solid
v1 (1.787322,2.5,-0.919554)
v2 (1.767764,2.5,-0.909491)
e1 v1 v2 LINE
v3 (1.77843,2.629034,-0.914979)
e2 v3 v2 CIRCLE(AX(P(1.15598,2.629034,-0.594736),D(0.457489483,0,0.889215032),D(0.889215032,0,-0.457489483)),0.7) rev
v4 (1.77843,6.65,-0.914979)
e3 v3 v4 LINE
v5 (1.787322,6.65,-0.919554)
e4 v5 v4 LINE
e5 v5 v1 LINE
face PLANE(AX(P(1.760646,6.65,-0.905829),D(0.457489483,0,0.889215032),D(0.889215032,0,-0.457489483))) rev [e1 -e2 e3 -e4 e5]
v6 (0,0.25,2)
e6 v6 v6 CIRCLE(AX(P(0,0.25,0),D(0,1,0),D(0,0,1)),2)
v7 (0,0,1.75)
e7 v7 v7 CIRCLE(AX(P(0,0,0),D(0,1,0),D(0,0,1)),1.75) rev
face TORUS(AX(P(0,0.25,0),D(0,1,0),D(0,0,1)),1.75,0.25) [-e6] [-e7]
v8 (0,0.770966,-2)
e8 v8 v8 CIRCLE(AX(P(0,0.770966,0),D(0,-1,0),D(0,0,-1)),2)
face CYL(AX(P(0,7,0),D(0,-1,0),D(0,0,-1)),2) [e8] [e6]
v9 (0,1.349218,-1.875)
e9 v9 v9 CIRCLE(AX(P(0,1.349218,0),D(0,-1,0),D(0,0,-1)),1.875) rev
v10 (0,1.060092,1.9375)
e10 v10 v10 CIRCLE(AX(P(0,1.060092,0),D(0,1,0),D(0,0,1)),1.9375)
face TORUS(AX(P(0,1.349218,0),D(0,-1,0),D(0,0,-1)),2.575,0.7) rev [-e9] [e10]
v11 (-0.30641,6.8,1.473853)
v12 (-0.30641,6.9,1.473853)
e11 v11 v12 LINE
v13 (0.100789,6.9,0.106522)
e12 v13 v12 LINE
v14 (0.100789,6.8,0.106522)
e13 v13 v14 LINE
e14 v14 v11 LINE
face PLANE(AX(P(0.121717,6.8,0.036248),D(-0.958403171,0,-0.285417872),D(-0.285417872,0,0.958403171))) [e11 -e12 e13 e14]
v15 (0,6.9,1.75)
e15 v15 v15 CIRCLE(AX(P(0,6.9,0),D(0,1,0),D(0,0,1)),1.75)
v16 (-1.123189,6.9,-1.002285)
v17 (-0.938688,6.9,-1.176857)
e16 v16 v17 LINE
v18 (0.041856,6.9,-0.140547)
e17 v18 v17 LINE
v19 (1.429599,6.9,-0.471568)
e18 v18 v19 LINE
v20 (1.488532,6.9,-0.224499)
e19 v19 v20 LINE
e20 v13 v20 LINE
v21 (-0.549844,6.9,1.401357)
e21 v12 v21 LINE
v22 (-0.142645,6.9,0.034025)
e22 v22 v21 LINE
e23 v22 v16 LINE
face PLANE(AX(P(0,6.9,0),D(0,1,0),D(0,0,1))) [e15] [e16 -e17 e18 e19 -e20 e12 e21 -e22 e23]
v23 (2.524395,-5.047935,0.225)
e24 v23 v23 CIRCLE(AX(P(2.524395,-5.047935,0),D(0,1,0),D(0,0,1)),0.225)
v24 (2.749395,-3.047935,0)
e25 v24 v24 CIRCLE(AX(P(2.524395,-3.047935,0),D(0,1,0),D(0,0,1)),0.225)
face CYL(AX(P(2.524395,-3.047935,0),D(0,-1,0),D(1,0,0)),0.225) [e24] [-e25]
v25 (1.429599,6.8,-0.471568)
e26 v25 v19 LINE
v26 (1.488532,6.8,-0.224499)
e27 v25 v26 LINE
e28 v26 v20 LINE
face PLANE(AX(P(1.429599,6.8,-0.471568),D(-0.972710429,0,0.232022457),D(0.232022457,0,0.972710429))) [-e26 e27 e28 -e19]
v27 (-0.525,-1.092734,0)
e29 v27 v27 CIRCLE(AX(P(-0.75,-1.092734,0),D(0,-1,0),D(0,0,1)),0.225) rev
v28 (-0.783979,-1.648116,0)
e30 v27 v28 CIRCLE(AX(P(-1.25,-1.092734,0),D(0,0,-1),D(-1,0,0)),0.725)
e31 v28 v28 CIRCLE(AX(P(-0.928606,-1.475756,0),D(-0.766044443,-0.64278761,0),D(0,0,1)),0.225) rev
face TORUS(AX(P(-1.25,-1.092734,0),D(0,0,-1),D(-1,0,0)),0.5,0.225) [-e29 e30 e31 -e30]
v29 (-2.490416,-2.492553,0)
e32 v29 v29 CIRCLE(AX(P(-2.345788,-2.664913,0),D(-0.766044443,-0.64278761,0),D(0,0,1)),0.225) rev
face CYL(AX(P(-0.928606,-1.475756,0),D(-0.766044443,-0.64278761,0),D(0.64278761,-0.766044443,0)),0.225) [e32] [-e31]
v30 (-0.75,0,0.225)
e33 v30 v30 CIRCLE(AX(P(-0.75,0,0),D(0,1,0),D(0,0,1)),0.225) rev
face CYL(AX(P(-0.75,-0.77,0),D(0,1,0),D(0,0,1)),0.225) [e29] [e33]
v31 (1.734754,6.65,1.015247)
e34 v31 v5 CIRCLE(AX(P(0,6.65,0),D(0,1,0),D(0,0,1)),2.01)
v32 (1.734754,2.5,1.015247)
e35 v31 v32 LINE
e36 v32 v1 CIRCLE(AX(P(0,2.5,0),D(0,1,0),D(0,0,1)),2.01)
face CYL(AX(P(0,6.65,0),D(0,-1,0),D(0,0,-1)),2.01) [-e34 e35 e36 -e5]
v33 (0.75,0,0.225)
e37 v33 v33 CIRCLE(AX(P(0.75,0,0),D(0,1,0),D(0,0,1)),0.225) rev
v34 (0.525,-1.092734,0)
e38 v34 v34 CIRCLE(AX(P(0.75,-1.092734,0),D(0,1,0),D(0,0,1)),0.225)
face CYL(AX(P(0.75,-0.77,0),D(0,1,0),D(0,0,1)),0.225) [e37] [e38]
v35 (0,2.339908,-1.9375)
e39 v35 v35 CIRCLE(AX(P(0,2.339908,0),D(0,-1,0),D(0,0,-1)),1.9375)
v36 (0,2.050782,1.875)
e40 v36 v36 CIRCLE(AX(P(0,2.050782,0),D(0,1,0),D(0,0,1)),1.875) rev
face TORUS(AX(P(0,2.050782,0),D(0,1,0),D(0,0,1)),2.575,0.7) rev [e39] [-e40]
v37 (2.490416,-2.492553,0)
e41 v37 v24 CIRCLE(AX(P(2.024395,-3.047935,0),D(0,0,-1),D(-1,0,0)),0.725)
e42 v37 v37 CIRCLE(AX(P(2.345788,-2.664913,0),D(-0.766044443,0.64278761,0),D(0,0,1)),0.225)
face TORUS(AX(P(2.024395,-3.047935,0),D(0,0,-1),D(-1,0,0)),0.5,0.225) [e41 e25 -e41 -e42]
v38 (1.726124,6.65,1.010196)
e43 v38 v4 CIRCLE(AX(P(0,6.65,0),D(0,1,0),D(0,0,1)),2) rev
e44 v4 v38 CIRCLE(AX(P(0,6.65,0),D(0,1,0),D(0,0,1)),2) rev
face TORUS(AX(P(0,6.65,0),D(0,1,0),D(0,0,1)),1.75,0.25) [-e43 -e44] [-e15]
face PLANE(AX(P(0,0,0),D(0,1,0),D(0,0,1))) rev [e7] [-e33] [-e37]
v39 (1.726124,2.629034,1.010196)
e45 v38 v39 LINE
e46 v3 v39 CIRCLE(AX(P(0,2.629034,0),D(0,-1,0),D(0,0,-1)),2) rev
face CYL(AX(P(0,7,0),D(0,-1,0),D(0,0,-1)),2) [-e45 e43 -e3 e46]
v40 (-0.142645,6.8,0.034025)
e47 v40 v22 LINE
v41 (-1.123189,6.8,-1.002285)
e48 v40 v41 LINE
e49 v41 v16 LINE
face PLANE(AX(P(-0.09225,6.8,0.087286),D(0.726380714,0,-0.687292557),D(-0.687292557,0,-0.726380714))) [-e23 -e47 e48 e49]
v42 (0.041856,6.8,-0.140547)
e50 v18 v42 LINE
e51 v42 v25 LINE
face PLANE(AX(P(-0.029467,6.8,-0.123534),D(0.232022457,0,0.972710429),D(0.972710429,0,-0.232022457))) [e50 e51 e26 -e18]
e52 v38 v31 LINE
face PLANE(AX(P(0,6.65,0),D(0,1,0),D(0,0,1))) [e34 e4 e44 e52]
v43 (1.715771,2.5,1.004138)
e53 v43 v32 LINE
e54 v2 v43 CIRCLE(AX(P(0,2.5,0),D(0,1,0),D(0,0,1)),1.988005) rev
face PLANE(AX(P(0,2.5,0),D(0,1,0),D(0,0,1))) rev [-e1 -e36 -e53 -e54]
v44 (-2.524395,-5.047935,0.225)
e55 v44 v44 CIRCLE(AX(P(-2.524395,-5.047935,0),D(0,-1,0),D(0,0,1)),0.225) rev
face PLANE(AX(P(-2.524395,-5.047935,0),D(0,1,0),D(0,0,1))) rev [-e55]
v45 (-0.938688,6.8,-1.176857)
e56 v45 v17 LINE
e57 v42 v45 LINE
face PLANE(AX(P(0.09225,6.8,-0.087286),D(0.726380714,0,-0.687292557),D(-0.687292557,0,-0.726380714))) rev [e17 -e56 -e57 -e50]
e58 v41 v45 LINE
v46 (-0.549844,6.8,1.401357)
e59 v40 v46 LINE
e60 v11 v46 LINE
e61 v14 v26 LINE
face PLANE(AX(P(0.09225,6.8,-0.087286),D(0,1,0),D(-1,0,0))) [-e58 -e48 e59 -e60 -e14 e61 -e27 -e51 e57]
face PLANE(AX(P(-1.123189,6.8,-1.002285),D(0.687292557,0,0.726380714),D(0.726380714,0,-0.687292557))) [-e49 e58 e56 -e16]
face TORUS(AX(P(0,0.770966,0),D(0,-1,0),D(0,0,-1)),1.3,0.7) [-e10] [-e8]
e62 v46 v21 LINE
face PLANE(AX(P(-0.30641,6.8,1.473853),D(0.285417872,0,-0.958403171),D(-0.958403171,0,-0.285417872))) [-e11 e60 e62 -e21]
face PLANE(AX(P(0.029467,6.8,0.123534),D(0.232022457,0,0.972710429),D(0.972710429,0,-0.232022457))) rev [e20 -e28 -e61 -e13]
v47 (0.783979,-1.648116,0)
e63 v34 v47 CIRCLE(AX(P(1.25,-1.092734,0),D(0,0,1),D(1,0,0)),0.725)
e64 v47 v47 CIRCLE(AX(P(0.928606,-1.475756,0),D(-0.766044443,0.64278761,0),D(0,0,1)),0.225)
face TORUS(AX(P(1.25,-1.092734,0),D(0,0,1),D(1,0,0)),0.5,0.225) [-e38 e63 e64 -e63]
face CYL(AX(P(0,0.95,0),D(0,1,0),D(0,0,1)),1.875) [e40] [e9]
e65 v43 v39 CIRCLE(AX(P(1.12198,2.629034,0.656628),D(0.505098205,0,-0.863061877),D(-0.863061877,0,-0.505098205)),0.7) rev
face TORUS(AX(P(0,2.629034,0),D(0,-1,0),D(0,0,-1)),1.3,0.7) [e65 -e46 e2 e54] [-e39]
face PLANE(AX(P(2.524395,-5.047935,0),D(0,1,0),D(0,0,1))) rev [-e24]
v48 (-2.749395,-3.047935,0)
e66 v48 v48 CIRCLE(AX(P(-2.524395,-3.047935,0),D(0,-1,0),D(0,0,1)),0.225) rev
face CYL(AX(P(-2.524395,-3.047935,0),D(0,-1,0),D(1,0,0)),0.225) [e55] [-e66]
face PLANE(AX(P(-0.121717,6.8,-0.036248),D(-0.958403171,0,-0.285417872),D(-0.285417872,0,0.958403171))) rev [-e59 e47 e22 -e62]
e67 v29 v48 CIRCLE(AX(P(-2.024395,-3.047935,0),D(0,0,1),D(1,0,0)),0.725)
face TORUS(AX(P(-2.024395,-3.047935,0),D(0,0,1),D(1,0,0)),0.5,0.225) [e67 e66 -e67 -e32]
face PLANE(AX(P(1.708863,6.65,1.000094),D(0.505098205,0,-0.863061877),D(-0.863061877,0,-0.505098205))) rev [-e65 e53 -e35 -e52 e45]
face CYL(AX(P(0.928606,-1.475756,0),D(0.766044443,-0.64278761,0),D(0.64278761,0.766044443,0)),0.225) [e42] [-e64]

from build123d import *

# Parameters (mm, degrees)
SKETCH1_R               = 2
EXTRUDE1_DEPTH          = 7
SKETCH2_R               = 3.5
CUT_EXTRUDE1_DEPTH      = 0.1
FILLET1_R               = 0.25
CUT_EXTRUDE2_DEPTH      = 0.75
CUT_EXTRUDE2_DEPTH_BACK = 0.75
SKETCH3_OUTSIDE_W       = 7.784
SKETCH3_OUTSIDE_H       = 7.784
SKETCH3_OUTSIDE_R       = 1.875
FILLET2_R               = 0.7
FILLET3_R               = 0.7
CUT_EXTRUDE_THIN2_DEPTH = 0.1
CUT_EXTRUDE_THIN3_DEPTH = 0.1
CUT_EXTRUDE_THIN4_DEPTH = 0.1
SKETCH5_R               = 0.225
EXTRUDE2_DEPTH          = 0.77
BOSS_EXTRUDE1_DEPTH     = 4.15
SKETCH9_R               = 0.225


with BuildPart() as part:
    # Sketch1 → Extrude1 (new body)
    with BuildSketch(Plane(origin=(0, 0, 0), x_dir=(1, 0, 0), z_dir=(0, 1, 0))):
        with Locations(Location((0, 0, 0), (0, 0, 270))):
            Circle(SKETCH1_R)
    extrude(amount=EXTRUDE1_DEPTH)

    # Sketch2 → Cut-Extrude1 (cut)
    with BuildSketch(Plane(origin=(0, 7, 0), x_dir=(-1, 0, 0), z_dir=(0, 1, 0))):
        Circle(SKETCH2_R)
    extrude(amount=-CUT_EXTRUDE1_DEPTH, mode=Mode.SUBTRACT)

    # Fillet1
    fillet1_edges = [part.edges().sort_by_distance(p)[0] for p in [
        (0, 0, -2),
        (0, 6.9, -2),
    ]]
    fillet(fillet1_edges, radius=FILLET1_R)

    # Sketch3 outside → Cut-Extrude2 (cut, two sides: drawn at the far end of the back side and taken through both)
    with BuildSketch(Plane(origin=(0, 1.7, 0), x_dir=(-1, 0, 0), z_dir=(0, 1, 0)).offset(-CUT_EXTRUDE2_DEPTH_BACK)):
        Rectangle(SKETCH3_OUTSIDE_W, SKETCH3_OUTSIDE_H)
        with Locations(Location((0, 0, 0), (0, 0, 90))):
            Circle(SKETCH3_OUTSIDE_R, mode=Mode.SUBTRACT)
    extrude(amount=CUT_EXTRUDE2_DEPTH + CUT_EXTRUDE2_DEPTH_BACK, mode=Mode.SUBTRACT)

    # Fillet2
    # the kernel refuses this fillet: 0.7 mm, written as the material it adds along each edge
    with BuildSketch(Plane(origin=(0, 0.95, 0), x_dir=(0, 0, 1), z_dir=(-1, 0, 0))) as fillet2_piece_1:
        with BuildLine():
            CenterArc((2.575, 0.399217986), FILLET2_R, 180, 34.771944032)
            Line((1.875, 0.399217986), (1.861, 0.399217986))
            Line((1.861, 0.399217986), (1.861, 0))
            Line((1.861, 0), (1.875, -0.014))
            ThreePointArc((1.875, -0.014), (1.9375, -0.014), (1.9885, -0.00798436))
            Line((1.9885, -0.00798436), (2, 0))
        make_face()
    revolve(axis=Axis((0, 0.95, 0), (0, 1, 0)))
    with BuildSketch(Plane(origin=(0, 2.45, 0), x_dir=(0, 0, 1), z_dir=(-1, 0, 0))) as fillet2_piece_2:
        with BuildLine():
            CenterArc((2.575, -0.399217986), FILLET2_R, 145.228055968, 34.771944032)
            Line((2, 0), (1.9885, 0.00798436))
            ThreePointArc((1.9885, 0.00798436), (1.9375, 0.014), (1.875, 0.014))
            Line((1.875, 0.014), (1.861, 0))
            Line((1.861, 0), (1.861, -0.399217986))
            Line((1.861, -0.399217986), (1.875, -0.399217986))
        make_face()
    revolve(axis=Axis((0, 2.45, 0), (0, 1, 0)))

    # Fillet3
    fillet3_edges = [part.edges().sort_by_distance(p)[0] for p in [
        (0, 2.45, -2),
        (0, 0.95, -2),
    ]]
    fillet(fillet3_edges, radius=FILLET3_R)

    # Sketch4 → Cut-Extrude-Thin2 (cut)
    with BuildSketch(Plane(origin=(0, 6.9, 0), x_dir=(-1, 0, 0), z_dir=(0, 1, 0))):
        Polygon((-0.092250351, -0.087286155), (0.938688485, -1.176857225), (1.123189186, -1.002284916), (0.092250351, 0.087286155), align=None)
    extrude(amount=-CUT_EXTRUDE_THIN2_DEPTH, mode=Mode.SUBTRACT)

    # Sketch4<3> → Cut-Extrude-Thin3 (cut)
    with BuildSketch(Plane(origin=(0, 6.9, 0), x_dir=(-1, 0, 0), z_dir=(0, 1, 0))):
        Polygon((-0.029466852, 0.123534225), (-1.488532496, -0.224499462), (-1.429598792, -0.471567911), (0.029466852, -0.123534225), align=None)
    extrude(amount=-CUT_EXTRUDE_THIN3_DEPTH, mode=Mode.SUBTRACT)

    # Sketch4<4> → Cut-Extrude-Thin4 (cut)
    with BuildSketch(Plane(origin=(0, 6.9, 0), x_dir=(-1, 0, 0), z_dir=(0, 1, 0))):
        Polygon((0.121717203, -0.03624807), (0.549844011, 1.401356687), (0.306409606, 1.473852826), (-0.121717203, 0.03624807), align=None)
    extrude(amount=-CUT_EXTRUDE_THIN4_DEPTH, mode=Mode.SUBTRACT)

    # Sketch5 → Extrude2 (add)
    with BuildSketch(Plane.XZ):
        with Locations(Location((-0.75, 0, 0), (0, 0, 90))):
            Circle(SKETCH5_R)
        with Locations(Location((0.75, 0, 0), (0, 0, 90))):
            Circle(SKETCH5_R)
    extrude(amount=EXTRUDE2_DEPTH)

    # Sketch6 → Boss-Extrude1 (add)
    with BuildSketch(Plane(origin=(0, 2.5, 0), x_dir=(1, 0, 0), z_dir=(0, 1, 0))):
        with BuildLine():
            Line((1.760645763, 0.905829177), (1.787322214, 0.919553862))
            ThreePointArc((1.787322214, 0.919553862), (2.009258531, -0.054590818), (1.734754372, -1.015247393))
            Line((1.734754372, -1.015247393), (1.708862516, -1.000094447))
            ThreePointArc((1.708862516, -1.000094447), (1.979269597, -0.05377603), (1.760645763, 0.905829177))
        make_face()
    extrude(amount=BOSS_EXTRUDE1_DEPTH)

    # Sweep2: sweep along a path in Sketch8
    with BuildLine(Plane(origin=(0, -2, 0), x_dir=(1, 0, 0), z_dir=(0, 0, -1))) as sweep2_path:
        Line((2.52439461, 3.047935202), (2.52439461, 1.047935202))
        ThreePointArc((2.52439461, 1.047935202), (2.477548504, 0.836626071), (2.345788415, 0.66491298))
        Line((2.345788415, 0.66491298), (0.928606195, -0.524244097))
        ThreePointArc((0.928606195, -0.524244097), (0.796846106, -0.695957188), (0.75, -0.907266319))
        Line((0.75, -0.907266319), (0.75, -1.23))
    # Sketch9 → Sweep2 (sweep)
    with BuildSketch(Plane(origin=(0, -0.77, -4.656884625), x_dir=(1, 0, 0), z_dir=(0, 1, 0))):
        with Locations((0.75, -4.656884625)):
            Circle(SKETCH9_R)
    sweep2 = sweep(path=sweep2_path.line)

    # Mirror1: Sweep2 across plane
    add(sweep2.mirror(Plane(origin=(0, 0, 0), x_dir=(0, 0, 1), z_dir=(1, 0, 0))))


solid = part.part
